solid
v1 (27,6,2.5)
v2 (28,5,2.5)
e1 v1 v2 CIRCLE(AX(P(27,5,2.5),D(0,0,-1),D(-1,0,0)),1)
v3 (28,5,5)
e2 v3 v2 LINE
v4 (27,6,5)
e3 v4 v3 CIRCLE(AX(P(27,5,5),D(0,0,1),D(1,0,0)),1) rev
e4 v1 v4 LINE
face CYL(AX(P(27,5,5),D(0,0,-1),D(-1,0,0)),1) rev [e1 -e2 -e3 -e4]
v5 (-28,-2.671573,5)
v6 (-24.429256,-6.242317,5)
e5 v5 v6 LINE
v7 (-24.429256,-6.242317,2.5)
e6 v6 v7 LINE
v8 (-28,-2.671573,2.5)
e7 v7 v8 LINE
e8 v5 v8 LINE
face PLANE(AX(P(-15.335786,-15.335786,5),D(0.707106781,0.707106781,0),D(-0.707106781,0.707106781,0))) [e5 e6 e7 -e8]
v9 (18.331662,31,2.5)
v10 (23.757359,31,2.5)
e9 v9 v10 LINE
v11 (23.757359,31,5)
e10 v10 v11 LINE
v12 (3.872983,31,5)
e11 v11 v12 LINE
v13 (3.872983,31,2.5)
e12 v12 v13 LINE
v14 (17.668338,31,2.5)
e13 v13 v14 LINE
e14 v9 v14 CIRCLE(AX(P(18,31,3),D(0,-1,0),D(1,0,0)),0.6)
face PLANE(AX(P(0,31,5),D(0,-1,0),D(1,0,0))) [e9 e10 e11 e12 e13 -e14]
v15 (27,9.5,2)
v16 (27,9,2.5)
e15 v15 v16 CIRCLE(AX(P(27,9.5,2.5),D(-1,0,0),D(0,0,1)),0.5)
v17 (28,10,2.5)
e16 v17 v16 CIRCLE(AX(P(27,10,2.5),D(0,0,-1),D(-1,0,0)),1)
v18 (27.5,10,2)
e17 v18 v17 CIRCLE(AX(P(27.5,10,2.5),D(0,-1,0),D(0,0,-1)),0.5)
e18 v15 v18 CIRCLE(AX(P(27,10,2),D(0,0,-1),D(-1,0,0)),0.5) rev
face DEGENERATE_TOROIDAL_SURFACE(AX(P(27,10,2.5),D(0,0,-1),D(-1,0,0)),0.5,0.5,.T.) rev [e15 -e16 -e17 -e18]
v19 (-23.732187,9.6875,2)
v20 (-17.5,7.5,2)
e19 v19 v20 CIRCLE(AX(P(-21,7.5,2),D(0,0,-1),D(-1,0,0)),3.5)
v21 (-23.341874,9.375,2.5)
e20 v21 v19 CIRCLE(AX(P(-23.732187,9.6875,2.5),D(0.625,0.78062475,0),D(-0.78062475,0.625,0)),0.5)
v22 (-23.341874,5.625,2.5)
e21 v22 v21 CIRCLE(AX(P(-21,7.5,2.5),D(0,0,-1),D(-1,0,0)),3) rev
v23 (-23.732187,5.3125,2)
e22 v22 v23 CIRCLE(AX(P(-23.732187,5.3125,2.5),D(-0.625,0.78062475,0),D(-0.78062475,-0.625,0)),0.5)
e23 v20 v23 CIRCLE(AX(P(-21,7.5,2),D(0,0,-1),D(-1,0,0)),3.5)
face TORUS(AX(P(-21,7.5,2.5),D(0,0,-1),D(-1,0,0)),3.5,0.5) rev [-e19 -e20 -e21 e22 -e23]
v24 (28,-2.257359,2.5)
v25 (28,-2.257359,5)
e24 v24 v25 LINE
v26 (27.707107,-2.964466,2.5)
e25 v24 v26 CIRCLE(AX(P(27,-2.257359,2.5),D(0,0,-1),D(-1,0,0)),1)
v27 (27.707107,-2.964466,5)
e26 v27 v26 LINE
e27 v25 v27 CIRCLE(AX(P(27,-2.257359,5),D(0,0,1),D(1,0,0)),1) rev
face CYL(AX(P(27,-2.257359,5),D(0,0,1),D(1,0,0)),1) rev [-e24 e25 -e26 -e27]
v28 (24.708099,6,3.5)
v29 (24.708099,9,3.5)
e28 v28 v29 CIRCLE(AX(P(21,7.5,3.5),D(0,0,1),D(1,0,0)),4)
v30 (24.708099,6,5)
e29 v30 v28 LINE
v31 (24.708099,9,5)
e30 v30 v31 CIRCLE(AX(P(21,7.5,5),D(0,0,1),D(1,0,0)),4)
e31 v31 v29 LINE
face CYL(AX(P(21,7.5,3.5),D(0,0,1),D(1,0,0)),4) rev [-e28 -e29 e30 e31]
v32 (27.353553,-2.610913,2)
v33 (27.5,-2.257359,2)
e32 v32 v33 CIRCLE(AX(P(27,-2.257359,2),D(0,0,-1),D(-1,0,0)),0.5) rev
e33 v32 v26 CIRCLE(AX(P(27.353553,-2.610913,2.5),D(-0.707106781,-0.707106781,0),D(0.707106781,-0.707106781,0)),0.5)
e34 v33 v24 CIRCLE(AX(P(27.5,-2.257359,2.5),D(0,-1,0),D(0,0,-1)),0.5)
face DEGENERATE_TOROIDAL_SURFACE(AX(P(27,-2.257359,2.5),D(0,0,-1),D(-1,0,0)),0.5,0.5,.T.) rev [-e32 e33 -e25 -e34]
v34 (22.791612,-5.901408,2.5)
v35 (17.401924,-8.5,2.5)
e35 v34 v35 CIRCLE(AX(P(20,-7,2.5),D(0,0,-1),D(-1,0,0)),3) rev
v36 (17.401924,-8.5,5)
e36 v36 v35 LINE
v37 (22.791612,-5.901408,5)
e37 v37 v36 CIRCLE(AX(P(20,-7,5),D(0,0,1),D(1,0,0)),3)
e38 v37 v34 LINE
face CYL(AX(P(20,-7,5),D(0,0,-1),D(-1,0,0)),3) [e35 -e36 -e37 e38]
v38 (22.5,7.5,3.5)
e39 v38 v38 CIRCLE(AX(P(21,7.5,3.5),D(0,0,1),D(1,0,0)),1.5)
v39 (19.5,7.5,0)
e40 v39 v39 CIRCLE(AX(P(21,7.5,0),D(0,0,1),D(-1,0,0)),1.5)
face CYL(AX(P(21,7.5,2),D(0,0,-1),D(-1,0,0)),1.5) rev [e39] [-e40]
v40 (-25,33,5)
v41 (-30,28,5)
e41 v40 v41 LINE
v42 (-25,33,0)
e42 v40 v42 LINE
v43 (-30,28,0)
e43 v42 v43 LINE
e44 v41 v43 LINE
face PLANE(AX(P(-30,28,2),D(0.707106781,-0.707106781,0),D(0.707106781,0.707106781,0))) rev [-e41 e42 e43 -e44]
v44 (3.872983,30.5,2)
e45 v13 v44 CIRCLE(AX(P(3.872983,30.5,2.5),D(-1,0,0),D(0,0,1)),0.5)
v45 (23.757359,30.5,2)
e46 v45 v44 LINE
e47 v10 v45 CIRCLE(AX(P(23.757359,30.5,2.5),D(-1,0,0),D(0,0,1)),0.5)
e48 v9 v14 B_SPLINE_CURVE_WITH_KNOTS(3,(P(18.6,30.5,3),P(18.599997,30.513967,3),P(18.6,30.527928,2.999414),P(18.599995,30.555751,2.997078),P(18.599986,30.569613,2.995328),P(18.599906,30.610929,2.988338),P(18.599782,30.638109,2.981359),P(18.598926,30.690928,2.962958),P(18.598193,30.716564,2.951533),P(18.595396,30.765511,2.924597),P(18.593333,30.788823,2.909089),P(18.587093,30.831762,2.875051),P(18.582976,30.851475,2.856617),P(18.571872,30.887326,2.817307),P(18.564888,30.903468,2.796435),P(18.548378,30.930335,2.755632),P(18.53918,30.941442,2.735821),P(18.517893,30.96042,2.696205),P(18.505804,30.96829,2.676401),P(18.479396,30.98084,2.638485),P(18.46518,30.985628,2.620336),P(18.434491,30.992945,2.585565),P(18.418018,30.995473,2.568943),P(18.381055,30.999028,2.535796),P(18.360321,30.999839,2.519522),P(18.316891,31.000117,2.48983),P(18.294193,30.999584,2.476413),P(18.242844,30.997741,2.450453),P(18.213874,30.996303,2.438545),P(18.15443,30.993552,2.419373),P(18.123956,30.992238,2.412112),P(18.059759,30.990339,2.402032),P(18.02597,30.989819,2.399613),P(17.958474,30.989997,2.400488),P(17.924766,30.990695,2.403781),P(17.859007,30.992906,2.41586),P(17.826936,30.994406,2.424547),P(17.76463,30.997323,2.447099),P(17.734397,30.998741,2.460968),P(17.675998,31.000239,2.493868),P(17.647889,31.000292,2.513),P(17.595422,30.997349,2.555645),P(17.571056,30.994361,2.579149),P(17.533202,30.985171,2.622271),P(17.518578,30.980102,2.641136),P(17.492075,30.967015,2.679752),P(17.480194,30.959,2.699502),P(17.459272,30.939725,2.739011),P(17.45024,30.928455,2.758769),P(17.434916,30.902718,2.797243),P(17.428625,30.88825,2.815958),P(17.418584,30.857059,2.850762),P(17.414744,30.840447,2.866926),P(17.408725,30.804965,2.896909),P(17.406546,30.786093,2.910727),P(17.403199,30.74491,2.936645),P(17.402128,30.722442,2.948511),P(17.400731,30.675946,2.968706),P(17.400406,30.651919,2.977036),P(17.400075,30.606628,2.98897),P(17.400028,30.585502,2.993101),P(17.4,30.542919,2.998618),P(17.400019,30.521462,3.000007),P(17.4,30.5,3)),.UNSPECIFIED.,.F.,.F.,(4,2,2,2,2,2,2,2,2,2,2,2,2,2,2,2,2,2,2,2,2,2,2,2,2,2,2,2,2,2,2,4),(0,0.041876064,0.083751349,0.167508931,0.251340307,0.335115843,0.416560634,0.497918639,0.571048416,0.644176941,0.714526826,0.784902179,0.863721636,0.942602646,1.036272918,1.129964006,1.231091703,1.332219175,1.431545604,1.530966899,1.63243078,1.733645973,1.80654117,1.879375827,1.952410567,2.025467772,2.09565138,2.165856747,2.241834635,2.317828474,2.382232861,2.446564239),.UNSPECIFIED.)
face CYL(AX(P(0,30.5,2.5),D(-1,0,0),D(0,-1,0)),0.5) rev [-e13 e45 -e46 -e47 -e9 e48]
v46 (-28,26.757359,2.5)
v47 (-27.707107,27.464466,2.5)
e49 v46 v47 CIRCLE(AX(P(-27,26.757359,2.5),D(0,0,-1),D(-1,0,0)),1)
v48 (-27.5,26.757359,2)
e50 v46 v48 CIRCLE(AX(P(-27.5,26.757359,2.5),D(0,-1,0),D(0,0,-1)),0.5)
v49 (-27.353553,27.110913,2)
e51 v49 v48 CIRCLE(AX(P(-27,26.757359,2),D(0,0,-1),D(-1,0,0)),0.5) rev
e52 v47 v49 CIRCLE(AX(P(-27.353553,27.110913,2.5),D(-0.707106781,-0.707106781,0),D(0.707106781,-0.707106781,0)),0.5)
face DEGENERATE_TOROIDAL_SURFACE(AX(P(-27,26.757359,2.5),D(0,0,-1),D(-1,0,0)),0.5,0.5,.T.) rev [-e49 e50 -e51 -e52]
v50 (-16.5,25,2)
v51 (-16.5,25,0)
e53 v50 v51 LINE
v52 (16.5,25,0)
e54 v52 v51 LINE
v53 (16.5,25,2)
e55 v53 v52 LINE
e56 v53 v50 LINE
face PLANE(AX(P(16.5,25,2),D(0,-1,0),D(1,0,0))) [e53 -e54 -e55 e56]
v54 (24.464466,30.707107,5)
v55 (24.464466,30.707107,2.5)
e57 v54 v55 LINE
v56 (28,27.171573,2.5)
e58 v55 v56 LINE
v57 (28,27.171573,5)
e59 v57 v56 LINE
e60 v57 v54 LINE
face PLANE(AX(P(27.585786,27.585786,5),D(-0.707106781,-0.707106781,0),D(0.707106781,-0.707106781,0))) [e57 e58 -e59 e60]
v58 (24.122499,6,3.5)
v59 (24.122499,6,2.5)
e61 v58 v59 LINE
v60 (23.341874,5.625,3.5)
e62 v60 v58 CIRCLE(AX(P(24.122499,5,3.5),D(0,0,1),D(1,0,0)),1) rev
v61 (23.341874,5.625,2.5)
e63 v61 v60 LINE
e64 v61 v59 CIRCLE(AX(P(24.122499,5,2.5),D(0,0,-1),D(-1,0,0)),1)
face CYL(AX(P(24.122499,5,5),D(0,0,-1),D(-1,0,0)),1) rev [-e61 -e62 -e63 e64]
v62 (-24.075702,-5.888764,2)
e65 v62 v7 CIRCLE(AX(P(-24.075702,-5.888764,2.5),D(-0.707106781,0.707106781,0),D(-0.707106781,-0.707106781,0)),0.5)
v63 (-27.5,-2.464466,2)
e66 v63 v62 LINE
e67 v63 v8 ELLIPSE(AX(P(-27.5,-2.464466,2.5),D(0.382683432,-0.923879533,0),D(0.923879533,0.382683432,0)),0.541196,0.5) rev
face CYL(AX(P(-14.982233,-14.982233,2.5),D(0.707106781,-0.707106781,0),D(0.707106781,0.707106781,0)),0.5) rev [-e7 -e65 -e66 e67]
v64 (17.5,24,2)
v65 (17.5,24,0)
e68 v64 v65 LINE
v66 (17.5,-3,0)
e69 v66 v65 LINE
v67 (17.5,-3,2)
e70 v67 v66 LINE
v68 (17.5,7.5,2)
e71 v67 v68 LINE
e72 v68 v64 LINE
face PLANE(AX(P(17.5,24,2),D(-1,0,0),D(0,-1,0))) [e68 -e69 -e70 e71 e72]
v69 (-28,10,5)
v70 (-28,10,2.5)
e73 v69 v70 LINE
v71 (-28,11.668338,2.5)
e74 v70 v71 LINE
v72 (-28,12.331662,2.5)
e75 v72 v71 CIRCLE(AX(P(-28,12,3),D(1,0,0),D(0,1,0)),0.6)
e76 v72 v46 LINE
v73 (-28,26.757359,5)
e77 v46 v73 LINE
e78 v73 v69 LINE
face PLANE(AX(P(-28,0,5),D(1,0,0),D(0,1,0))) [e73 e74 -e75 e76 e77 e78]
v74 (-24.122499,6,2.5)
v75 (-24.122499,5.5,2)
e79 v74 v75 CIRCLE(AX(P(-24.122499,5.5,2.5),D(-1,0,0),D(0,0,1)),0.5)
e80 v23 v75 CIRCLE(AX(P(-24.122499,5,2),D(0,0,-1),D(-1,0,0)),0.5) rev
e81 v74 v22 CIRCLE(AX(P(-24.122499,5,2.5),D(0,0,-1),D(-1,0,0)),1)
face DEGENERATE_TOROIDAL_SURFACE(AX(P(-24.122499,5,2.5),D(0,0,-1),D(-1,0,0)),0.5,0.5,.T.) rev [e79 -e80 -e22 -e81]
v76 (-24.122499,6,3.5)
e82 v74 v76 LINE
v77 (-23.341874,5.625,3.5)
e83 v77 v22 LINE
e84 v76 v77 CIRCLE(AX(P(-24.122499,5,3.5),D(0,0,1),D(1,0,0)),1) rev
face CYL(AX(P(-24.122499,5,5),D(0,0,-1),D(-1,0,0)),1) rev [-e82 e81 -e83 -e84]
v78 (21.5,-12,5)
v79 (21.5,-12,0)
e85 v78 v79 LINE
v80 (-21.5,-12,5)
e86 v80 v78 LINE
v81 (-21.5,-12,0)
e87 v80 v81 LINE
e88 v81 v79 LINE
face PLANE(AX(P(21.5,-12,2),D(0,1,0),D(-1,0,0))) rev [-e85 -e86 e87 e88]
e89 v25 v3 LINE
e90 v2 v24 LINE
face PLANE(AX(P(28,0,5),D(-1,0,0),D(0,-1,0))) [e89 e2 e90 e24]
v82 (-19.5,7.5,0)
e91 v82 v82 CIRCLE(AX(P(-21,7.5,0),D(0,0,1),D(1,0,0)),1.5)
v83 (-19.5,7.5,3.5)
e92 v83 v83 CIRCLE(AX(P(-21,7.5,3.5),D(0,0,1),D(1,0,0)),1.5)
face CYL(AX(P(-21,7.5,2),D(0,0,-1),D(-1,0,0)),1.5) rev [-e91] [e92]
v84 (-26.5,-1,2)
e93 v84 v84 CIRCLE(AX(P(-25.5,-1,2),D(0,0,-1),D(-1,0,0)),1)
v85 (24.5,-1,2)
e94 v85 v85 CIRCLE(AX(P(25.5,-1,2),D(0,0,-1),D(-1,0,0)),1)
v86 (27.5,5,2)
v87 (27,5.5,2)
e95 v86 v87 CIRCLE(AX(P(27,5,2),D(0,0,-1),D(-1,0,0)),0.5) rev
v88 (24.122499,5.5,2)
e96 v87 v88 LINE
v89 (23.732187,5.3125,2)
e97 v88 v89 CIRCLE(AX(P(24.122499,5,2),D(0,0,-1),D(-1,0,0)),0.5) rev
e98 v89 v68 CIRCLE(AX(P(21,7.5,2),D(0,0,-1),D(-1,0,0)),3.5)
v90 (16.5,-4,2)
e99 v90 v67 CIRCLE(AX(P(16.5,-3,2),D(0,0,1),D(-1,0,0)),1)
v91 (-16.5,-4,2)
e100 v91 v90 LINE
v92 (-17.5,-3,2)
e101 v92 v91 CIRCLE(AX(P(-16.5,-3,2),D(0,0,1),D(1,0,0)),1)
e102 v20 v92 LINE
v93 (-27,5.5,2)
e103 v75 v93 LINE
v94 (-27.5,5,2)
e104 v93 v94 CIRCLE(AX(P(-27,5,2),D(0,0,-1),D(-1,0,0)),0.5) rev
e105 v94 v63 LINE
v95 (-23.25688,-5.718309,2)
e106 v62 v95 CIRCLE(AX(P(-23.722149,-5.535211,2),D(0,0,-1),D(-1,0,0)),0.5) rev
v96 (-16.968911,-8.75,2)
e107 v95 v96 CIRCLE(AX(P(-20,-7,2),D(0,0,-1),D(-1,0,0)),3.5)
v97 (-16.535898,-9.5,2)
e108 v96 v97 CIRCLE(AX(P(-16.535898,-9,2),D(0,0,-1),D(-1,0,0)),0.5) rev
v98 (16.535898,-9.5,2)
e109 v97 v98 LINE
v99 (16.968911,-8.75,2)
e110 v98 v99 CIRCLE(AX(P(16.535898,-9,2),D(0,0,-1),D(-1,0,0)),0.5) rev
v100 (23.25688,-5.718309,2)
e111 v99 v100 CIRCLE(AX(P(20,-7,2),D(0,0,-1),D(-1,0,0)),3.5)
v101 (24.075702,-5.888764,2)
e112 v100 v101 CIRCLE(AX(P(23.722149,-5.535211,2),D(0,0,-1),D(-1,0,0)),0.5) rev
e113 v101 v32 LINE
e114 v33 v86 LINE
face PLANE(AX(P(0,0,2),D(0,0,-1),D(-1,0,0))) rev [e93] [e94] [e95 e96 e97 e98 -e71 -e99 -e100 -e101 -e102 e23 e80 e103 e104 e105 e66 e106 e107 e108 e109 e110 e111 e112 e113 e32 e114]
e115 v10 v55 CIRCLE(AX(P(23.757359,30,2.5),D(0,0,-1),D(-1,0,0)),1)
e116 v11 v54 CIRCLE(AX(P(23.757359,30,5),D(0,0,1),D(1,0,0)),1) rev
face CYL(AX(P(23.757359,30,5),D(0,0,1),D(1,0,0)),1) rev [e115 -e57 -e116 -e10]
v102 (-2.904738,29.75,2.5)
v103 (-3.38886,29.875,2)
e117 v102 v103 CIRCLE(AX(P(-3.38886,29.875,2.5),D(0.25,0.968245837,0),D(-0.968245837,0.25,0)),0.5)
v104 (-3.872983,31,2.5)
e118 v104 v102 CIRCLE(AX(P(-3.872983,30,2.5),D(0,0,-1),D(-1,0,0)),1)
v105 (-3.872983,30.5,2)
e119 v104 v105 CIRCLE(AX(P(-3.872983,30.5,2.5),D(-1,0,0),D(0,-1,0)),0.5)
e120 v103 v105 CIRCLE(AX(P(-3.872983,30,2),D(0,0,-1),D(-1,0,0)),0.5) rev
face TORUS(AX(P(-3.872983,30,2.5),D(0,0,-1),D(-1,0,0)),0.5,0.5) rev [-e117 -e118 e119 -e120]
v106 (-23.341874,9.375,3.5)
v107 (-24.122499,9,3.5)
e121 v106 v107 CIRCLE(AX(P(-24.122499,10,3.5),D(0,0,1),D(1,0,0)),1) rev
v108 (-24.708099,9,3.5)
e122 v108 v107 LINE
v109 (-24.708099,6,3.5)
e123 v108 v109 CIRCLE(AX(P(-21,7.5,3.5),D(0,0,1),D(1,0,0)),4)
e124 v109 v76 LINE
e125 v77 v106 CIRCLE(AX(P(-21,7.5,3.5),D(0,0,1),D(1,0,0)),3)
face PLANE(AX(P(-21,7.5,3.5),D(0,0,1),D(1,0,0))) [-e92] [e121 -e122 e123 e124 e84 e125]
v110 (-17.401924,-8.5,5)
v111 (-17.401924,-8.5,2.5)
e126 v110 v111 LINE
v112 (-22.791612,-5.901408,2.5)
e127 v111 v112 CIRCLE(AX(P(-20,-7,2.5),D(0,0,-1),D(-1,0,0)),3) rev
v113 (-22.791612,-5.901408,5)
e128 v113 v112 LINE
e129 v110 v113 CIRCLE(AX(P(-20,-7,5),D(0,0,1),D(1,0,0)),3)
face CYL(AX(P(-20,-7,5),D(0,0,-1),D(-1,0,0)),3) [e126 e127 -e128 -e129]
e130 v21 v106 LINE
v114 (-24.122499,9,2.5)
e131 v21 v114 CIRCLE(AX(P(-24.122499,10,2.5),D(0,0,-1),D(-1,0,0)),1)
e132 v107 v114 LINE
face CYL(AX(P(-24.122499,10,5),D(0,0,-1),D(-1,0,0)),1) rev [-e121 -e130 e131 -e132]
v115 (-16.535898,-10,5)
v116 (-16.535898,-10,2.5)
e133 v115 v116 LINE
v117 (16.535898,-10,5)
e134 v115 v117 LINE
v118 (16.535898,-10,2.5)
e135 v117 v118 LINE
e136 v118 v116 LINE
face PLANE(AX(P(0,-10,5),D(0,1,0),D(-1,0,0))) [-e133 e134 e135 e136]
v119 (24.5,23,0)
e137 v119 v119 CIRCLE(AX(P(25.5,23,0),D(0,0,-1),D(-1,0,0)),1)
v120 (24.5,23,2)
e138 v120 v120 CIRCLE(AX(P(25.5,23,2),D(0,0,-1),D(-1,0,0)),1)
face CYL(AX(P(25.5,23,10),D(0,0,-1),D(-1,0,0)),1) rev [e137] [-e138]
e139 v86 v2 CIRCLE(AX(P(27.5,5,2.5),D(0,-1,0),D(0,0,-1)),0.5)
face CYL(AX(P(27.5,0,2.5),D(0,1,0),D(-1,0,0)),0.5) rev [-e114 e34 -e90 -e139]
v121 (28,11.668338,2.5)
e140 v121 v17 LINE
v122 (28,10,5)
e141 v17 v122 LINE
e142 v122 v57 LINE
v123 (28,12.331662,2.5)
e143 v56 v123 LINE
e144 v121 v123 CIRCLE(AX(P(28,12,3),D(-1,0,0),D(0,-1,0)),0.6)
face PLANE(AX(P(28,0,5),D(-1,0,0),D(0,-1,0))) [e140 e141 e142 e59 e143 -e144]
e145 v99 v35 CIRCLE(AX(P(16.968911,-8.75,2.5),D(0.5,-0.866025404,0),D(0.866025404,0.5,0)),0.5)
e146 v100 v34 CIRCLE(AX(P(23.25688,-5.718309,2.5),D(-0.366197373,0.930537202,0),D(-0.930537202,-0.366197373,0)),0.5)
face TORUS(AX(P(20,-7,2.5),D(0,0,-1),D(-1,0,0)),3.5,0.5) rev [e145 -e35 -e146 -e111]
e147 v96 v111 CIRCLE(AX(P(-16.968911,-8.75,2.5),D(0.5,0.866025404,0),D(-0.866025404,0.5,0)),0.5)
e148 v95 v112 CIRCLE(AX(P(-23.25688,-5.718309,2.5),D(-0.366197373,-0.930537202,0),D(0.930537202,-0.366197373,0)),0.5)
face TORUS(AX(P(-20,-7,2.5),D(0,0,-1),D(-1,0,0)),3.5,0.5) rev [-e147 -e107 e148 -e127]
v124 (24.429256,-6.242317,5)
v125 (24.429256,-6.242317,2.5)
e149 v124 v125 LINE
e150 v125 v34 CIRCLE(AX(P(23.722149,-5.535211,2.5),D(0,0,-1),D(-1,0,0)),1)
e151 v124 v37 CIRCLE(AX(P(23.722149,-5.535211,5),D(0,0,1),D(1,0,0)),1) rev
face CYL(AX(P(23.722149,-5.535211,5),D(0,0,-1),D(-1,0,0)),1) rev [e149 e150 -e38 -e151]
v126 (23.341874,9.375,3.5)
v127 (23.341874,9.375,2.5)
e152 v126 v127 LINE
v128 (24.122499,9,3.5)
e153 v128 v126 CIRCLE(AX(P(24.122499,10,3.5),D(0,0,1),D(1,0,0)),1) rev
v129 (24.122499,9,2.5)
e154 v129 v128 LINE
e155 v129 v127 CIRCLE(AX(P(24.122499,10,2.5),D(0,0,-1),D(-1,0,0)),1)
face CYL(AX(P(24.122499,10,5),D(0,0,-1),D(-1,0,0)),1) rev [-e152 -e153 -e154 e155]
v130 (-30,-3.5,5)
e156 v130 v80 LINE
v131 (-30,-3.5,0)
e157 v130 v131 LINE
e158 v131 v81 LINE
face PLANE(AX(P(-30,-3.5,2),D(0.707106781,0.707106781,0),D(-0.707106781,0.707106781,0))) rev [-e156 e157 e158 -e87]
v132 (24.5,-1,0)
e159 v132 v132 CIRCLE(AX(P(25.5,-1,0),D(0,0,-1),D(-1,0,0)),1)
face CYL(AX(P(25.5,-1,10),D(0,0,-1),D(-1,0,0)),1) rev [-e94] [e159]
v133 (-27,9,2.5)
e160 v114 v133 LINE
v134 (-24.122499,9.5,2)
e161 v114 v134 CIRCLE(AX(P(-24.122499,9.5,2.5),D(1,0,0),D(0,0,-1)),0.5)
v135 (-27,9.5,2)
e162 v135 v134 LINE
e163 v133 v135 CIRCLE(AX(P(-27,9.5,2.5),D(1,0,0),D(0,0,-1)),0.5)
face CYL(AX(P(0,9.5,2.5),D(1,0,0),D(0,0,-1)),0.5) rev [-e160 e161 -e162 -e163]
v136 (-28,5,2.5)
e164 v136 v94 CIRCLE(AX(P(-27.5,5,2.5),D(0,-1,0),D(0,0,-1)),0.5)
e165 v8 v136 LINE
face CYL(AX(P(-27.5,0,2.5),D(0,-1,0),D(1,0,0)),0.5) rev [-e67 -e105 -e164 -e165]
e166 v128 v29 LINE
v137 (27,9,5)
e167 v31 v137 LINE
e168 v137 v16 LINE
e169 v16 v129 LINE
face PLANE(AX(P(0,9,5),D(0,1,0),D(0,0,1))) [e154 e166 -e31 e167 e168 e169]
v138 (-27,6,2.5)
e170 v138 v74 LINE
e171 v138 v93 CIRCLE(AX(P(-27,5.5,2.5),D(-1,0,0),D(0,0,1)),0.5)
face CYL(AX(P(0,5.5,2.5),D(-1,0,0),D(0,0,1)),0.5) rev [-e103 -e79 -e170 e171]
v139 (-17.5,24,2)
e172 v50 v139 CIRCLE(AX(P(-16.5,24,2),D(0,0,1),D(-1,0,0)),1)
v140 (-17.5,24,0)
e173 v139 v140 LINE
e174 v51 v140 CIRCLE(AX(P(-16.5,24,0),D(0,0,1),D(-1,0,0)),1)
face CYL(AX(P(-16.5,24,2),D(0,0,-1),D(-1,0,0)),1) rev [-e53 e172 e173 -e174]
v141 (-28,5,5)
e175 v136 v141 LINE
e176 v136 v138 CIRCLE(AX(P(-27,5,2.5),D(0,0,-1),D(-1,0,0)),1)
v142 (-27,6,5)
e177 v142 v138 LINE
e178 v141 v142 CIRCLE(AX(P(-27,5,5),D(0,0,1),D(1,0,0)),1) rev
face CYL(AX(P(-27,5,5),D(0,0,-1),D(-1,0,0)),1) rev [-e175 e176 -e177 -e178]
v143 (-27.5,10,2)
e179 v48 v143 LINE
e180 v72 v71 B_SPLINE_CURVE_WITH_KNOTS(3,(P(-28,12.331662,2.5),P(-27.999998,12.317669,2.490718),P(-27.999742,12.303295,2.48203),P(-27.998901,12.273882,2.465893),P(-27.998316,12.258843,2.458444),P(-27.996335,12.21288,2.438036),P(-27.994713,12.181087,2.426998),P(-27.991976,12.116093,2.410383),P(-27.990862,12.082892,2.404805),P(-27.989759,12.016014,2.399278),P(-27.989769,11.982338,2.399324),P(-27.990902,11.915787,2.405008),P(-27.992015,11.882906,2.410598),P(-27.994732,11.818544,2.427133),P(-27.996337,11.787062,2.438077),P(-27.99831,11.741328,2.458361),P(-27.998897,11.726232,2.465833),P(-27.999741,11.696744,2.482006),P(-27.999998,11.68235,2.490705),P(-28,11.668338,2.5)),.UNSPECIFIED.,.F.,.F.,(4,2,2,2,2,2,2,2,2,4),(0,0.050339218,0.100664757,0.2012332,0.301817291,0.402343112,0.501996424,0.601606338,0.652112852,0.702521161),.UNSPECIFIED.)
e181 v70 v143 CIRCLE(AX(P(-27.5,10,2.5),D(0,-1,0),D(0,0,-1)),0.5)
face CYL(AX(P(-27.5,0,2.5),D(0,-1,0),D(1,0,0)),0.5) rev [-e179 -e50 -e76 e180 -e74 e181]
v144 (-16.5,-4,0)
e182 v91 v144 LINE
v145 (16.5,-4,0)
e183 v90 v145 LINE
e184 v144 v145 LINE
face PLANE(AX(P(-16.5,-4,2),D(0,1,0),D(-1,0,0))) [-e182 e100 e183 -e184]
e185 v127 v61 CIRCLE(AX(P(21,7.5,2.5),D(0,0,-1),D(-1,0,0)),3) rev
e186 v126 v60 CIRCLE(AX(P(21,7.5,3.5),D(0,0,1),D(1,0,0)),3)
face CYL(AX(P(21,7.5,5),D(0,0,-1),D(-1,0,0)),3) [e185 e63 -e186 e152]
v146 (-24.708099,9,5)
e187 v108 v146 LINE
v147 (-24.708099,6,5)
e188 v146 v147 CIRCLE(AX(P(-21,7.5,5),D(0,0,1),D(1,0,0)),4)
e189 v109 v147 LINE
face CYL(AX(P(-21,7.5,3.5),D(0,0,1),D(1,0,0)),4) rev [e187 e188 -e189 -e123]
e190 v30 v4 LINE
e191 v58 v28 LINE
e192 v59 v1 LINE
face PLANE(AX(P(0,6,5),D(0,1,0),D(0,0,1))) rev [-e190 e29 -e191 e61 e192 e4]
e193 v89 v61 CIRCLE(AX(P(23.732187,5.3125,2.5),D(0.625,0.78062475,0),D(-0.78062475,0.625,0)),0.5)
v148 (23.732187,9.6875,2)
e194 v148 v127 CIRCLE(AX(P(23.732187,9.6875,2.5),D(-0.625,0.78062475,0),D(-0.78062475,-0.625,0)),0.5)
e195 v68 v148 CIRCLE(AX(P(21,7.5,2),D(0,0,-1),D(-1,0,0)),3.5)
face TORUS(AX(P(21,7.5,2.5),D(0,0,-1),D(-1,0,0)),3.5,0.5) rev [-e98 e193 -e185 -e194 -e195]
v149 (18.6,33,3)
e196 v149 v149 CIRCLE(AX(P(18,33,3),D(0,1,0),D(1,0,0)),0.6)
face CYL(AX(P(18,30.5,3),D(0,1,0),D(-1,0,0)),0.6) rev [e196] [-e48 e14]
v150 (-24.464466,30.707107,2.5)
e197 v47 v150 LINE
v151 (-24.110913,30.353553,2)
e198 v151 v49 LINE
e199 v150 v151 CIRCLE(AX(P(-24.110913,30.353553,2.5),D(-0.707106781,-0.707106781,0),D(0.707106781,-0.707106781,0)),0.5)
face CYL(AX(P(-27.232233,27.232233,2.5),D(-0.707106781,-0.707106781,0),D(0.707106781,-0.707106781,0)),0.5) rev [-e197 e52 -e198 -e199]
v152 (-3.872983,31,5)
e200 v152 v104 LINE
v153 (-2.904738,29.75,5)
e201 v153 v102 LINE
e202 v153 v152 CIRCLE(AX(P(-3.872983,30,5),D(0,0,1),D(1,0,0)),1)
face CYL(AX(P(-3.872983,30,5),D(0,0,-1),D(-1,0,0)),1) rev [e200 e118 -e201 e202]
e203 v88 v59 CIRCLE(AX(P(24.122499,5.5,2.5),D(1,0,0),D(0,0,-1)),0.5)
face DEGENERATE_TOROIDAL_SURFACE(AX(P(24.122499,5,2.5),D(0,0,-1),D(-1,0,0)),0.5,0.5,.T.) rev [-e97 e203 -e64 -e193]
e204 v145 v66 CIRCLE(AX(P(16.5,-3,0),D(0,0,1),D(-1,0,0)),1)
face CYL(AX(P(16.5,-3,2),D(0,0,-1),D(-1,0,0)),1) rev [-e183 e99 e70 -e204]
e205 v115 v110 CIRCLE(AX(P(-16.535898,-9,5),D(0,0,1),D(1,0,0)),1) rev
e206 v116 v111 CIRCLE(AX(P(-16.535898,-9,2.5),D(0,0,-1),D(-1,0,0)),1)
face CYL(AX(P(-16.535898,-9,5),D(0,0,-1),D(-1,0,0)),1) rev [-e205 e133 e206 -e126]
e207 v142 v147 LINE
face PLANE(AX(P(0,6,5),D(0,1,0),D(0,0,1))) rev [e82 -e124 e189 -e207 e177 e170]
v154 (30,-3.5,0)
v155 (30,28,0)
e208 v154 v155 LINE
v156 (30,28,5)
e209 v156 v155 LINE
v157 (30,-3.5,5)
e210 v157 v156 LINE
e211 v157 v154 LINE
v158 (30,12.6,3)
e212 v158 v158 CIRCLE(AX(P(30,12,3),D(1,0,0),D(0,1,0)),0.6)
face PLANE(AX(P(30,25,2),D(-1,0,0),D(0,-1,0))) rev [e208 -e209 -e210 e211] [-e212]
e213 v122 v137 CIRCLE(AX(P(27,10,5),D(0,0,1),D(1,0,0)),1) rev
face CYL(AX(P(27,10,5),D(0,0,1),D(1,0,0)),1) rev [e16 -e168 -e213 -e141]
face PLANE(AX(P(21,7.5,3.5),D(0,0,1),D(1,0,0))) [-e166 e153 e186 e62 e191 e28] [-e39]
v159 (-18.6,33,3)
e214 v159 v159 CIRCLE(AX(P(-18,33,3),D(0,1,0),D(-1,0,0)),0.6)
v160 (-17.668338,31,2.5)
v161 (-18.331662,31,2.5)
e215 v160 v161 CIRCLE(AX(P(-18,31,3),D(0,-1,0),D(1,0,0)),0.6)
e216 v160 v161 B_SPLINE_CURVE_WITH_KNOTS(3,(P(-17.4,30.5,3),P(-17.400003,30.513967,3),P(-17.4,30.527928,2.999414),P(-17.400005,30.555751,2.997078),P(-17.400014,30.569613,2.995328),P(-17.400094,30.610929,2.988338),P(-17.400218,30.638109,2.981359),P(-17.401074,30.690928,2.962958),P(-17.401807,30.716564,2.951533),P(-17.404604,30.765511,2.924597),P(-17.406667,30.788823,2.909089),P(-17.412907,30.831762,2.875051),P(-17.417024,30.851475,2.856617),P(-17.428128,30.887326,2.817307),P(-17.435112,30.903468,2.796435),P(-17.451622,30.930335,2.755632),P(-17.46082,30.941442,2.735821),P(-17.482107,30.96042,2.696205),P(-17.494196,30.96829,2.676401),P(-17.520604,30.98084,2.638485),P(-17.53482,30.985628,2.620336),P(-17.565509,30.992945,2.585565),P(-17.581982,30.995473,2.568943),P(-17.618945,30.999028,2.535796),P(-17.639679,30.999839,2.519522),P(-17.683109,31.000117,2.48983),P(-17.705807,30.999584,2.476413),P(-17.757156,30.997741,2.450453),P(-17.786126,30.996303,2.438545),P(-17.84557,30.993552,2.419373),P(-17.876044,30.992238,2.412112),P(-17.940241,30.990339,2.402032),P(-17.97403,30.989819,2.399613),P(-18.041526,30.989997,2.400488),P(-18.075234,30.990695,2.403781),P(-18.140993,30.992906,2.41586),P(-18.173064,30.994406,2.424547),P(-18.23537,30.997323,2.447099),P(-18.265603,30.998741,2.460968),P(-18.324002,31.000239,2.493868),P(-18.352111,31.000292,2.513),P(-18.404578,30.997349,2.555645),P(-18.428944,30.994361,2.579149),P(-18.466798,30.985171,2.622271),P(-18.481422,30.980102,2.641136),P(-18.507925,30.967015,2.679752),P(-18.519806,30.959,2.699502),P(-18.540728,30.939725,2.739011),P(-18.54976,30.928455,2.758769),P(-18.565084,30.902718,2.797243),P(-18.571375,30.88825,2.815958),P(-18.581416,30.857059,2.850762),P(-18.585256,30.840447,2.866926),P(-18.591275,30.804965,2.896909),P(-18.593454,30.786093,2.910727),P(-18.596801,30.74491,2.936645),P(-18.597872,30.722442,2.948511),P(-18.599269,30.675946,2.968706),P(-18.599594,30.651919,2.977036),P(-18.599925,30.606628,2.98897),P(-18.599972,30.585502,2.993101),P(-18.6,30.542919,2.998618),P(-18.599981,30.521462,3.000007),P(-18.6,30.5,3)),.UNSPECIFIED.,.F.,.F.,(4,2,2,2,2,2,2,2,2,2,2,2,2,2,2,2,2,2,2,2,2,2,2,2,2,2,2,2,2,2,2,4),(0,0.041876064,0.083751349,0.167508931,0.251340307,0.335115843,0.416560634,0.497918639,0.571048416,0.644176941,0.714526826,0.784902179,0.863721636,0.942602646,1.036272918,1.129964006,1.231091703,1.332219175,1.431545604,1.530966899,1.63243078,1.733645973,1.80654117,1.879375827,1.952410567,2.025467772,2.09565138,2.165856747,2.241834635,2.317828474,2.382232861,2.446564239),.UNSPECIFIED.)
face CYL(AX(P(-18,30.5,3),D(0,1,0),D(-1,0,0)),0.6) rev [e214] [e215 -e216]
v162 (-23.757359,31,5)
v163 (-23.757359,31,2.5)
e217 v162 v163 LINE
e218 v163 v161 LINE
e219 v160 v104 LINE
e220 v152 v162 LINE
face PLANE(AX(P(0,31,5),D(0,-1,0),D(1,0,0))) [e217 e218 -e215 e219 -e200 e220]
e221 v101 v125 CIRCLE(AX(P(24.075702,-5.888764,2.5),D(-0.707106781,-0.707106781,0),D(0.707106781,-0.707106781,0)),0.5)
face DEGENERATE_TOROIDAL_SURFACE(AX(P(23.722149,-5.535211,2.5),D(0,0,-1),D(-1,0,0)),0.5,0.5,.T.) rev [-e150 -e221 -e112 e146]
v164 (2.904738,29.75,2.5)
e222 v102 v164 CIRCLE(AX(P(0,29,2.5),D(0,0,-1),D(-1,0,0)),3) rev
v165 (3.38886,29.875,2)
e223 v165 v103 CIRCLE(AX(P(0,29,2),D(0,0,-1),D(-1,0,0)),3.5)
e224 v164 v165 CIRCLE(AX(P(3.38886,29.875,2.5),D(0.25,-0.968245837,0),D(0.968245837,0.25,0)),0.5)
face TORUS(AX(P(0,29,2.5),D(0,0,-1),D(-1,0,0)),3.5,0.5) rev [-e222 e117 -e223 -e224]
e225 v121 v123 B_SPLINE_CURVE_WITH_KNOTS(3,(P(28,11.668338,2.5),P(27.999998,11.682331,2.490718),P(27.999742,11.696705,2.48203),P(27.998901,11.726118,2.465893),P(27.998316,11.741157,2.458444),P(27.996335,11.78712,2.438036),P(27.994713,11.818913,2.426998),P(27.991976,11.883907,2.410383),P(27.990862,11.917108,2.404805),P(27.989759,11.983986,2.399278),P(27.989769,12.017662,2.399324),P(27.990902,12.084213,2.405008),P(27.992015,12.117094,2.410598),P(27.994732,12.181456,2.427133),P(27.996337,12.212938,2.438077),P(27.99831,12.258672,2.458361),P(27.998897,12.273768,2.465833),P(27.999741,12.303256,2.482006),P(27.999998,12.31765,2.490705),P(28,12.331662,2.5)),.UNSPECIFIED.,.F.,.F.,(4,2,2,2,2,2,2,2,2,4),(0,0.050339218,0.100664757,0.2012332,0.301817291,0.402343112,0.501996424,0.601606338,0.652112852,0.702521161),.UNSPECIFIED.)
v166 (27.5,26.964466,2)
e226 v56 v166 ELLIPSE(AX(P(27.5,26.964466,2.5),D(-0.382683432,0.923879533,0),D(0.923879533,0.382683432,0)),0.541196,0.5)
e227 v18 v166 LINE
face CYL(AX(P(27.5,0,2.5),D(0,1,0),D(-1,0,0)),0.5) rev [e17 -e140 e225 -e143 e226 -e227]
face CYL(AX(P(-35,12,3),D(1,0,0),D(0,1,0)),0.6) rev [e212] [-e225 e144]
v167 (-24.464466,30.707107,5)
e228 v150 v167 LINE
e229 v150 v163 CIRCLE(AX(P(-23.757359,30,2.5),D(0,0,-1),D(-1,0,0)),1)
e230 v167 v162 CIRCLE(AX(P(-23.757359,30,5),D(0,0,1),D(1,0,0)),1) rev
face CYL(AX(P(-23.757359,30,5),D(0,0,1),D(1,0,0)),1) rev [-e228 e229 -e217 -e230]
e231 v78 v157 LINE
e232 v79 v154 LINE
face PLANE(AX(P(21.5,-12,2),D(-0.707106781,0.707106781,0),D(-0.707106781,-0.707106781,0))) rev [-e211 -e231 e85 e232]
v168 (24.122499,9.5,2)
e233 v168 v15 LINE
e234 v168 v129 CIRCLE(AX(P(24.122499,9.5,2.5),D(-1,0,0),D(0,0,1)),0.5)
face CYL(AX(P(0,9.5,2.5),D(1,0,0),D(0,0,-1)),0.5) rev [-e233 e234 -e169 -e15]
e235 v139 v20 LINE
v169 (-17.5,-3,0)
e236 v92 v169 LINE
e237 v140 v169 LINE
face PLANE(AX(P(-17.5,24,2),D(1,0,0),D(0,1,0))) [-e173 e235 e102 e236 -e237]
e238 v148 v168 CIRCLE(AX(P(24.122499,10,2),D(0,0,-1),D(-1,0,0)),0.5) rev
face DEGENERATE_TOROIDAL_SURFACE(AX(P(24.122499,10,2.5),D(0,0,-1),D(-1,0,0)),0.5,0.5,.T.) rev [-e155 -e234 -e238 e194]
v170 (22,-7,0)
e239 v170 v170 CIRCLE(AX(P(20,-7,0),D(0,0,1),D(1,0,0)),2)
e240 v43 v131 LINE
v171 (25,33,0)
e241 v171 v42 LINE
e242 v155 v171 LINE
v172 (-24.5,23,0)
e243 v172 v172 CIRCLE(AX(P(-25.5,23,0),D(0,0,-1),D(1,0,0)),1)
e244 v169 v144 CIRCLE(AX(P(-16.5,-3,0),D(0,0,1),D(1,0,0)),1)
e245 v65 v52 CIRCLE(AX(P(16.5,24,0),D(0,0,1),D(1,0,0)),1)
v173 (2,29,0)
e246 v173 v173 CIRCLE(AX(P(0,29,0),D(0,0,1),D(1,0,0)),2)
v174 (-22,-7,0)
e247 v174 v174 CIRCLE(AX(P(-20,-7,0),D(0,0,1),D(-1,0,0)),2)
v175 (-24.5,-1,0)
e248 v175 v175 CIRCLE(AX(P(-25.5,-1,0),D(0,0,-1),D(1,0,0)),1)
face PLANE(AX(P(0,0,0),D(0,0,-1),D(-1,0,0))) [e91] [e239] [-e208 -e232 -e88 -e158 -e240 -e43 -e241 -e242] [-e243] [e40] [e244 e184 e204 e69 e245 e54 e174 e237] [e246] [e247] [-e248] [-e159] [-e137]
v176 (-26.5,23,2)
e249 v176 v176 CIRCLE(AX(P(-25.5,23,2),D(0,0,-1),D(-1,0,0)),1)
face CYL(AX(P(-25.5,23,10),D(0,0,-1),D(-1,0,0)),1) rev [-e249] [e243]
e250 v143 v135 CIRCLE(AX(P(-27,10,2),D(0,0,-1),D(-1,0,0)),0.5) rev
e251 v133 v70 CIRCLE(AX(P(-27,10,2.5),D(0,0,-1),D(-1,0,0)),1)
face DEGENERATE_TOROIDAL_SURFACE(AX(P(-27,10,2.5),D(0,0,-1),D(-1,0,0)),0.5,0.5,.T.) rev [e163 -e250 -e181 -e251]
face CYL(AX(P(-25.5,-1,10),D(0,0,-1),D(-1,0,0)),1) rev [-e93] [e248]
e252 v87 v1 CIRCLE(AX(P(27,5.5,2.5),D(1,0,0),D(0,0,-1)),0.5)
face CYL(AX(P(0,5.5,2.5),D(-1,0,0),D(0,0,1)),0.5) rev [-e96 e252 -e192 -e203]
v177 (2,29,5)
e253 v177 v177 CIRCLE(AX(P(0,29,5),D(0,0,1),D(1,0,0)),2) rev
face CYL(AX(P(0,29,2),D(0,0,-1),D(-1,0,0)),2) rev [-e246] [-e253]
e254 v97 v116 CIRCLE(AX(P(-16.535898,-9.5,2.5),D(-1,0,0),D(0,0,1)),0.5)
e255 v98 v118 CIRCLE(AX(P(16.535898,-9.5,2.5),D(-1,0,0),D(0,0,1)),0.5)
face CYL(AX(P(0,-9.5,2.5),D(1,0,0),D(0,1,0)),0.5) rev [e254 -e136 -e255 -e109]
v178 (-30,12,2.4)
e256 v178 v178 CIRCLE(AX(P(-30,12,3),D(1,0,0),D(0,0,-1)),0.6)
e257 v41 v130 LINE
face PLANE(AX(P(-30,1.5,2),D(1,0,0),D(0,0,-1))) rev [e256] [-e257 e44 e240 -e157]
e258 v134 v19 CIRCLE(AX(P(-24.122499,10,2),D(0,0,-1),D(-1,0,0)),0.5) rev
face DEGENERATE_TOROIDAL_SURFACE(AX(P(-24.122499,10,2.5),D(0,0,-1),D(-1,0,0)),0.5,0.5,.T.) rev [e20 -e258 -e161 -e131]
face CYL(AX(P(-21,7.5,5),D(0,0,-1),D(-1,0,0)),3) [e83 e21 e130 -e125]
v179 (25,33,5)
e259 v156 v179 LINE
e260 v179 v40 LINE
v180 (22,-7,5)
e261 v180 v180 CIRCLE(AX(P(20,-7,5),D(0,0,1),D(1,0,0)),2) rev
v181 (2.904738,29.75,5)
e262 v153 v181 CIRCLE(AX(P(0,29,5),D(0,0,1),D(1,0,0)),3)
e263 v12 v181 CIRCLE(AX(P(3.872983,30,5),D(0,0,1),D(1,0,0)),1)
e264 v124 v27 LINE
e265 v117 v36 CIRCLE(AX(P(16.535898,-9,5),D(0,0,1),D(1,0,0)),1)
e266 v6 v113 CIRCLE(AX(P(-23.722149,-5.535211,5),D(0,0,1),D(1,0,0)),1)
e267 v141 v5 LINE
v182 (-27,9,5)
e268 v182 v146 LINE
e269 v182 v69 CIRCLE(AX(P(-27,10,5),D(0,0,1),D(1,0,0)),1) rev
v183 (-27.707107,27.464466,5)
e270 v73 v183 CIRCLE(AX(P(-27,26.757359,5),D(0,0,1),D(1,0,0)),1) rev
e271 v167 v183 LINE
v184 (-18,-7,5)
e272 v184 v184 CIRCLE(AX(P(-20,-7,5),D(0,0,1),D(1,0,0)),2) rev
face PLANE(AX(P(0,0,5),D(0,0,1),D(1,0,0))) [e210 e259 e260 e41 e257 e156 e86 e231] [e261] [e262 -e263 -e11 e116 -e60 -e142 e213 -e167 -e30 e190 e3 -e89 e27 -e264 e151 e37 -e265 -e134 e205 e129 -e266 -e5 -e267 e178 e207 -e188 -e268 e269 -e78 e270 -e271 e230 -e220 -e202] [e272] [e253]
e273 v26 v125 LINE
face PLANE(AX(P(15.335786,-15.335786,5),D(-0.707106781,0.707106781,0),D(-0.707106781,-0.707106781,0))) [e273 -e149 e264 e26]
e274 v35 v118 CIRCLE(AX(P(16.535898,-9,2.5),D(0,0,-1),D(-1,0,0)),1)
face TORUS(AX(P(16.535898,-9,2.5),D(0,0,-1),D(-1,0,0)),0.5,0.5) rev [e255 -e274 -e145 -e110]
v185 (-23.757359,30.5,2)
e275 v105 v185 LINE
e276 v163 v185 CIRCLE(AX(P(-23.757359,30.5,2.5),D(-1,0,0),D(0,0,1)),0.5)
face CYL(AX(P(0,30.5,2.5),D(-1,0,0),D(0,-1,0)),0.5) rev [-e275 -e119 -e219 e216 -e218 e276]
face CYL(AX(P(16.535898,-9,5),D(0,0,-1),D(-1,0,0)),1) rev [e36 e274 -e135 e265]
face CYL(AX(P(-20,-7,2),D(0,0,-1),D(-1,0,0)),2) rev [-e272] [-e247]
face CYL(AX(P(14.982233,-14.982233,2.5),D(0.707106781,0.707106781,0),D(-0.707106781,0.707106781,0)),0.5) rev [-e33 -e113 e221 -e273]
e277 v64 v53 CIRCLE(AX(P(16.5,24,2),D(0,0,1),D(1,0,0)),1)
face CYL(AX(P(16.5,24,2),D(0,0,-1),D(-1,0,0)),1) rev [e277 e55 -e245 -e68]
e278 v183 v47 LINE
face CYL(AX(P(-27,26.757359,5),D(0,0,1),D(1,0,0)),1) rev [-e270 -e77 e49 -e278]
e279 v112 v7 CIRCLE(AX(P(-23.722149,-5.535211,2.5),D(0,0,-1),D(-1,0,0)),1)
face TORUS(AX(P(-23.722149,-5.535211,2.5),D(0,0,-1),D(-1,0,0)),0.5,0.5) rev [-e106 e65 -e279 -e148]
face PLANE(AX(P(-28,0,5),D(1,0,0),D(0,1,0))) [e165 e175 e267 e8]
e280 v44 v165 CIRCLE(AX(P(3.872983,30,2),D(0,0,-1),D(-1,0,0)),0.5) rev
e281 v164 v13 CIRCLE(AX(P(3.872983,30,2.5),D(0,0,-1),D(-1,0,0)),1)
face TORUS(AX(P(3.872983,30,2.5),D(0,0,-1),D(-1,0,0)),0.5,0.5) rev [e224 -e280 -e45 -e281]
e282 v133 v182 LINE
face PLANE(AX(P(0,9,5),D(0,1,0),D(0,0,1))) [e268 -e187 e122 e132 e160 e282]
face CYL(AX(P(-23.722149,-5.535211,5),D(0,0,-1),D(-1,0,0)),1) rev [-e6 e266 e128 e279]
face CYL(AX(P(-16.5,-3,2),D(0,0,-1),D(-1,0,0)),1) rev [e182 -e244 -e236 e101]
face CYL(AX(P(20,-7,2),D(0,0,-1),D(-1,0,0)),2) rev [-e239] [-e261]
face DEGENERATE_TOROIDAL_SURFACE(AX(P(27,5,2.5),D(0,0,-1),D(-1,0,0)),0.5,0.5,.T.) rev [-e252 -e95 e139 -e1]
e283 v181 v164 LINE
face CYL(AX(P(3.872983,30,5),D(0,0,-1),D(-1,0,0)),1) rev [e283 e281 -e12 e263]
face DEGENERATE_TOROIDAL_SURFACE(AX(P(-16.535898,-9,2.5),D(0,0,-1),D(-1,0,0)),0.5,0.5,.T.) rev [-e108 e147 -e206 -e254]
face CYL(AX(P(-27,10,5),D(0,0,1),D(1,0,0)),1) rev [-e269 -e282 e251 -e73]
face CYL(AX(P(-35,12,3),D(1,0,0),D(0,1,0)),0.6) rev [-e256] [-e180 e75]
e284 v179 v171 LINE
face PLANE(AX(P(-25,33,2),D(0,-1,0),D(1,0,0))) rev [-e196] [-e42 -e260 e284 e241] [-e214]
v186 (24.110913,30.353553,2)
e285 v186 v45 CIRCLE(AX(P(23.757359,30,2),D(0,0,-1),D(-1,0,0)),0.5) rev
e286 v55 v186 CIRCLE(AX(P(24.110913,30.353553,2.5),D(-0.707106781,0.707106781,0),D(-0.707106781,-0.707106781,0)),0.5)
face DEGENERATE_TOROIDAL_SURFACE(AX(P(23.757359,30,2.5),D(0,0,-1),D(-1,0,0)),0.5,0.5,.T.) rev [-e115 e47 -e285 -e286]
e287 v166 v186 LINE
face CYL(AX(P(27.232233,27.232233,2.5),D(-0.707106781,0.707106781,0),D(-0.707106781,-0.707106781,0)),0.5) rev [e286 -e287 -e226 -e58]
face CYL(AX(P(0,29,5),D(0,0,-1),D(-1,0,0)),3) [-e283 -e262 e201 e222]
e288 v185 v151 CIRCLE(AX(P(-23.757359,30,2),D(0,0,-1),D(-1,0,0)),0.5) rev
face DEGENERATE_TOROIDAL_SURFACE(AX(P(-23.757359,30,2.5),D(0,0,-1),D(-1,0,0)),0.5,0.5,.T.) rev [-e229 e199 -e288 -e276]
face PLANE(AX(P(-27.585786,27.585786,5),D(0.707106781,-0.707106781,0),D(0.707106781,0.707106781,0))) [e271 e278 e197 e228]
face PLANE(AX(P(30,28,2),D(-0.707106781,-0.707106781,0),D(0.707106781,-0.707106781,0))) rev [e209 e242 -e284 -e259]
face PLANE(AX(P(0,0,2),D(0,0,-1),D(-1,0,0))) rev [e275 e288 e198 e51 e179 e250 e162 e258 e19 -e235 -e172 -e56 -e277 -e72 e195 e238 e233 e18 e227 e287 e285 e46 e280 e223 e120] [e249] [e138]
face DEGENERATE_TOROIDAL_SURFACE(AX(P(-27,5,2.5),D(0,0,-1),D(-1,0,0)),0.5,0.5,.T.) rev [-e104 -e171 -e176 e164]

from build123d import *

# Parameters (mm, degrees)
SKETCH_1_R                = 2
SKETCH_1_R_2              = 1.5
EXTRUDE_1_DEPTH           = 2
BOSS_EXTRUDE1_OUTLINE_R   = 2
BOSS_EXTRUDE1_OUTLINE_R_2 = 1.5
BOSS_EXTRUDE1_DEPTH       = 3
FILLET2_R                 = 1
FILLET3_R                 = 0.5
SKETCH4_R                 = 4
CUT_EXTRUDE3_DEPTH        = 1.5
SKETCH5_R                 = 0.6
CUT_EXTRUDE4_DEPTH        = 2.5
SKETCH3_R                 = 1
CUT_EXTRUDE5_DEPTH        = 10
SKETCH6_R                 = 0.6
CUT_EXTRUDE6_DEPTH        = 65


# Read off the part's stored shape, not the designer's step: Boss-Extrude1
with BuildPart() as part:
    # 草图1 → 凸台-拉伸1 (new body)
    with BuildSketch(Plane.XY):
        Polygon((-30, 1.5), (-30, -3.5), (-21.5, -12), (-15.5, -12), (15.5, -12), (21.5, -12), (30, -3.5), (30, 1.5), (30, 25), (30, 28), (25, 33), (-25, 33), (-30, 28), (-30, 25), align=None)
        with Locations((20, -7)):
            Circle(SKETCH_1_R, mode=Mode.SUBTRACT)
        with Locations((0, 29)):
            Circle(SKETCH_1_R, mode=Mode.SUBTRACT)
        with Locations(Location((-20, -7, 0), (0, 0, 180))):
            Circle(SKETCH_1_R, mode=Mode.SUBTRACT)
        with Locations((-21, 7.5)):
            Circle(SKETCH_1_R_2, mode=Mode.SUBTRACT)
        with Locations(Location((21, 7.5, 0), (0, 0, 180))):
            Circle(SKETCH_1_R_2, mode=Mode.SUBTRACT)
        with BuildLine():
            Line((-17.5, 24), (-17.5, -3))
            ThreePointArc((-17.5, -3), (-17.207106781, -3.707106781), (-16.5, -4))
            Line((-16.5, -4), (16.5, -4))
            ThreePointArc((16.5, -4), (17.207106781, -3.707106781), (17.5, -3))
            Line((17.5, -3), (17.5, 24))
            ThreePointArc((17.5, 24), (17.207106781, 24.707106781), (16.5, 25))
            Line((16.5, 25), (-16.5, 25))
            ThreePointArc((-16.5, 25), (-17.207106781, 24.707106781), (-17.5, 24))
        make_face(mode=Mode.SUBTRACT)
    extrude(amount=EXTRUDE_1_DEPTH)

    # Boss-Extrude1 outline → Boss-Extrude1 (add)
    with BuildSketch(Plane.XY.offset(2)):
        Polygon((-21.5, -12), (21.5, -12), (30, -3.5), (30, 28), (25, 33), (-25, 33), (-30, 28), (-30, -3.5), align=None)
        with Locations((-20, -7)):
            Circle(BOSS_EXTRUDE1_OUTLINE_R, mode=Mode.SUBTRACT)
        with Locations((-21, 7.5)):
            Circle(BOSS_EXTRUDE1_OUTLINE_R_2, mode=Mode.SUBTRACT)
        with Locations((20, -7)):
            Circle(BOSS_EXTRUDE1_OUTLINE_R, mode=Mode.SUBTRACT)
        with Locations((21, 7.5)):
            Circle(BOSS_EXTRUDE1_OUTLINE_R_2, mode=Mode.SUBTRACT)
        with BuildLine():
            Line((28, 6), (28, -2.671572875))
            Line((28, -2.671572875), (24.429255588, -6.242317287))
            ThreePointArc((24.429255588, -6.242317287), (23.518347202, -6.514222715), (22.791611605, -5.90140788))
            ThreePointArc((22.791611605, -5.90140788), (18.697105438, -4.297692512), (17.401923789, -8.5))
            ThreePointArc((17.401923789, -8.5), (17.401923789, -9.5), (16.535898385, -10))
            Line((16.535898385, -10), (-16.535898385, -10))
            ThreePointArc((-16.535898385, -10), (-17.401923789, -9.5), (-17.401923789, -8.5))
            ThreePointArc((-17.401923789, -8.5), (-18.697105438, -4.297692512), (-22.791611605, -5.90140788))
            ThreePointArc((-22.791611605, -5.90140788), (-23.518347202, -6.514222715), (-24.429255588, -6.242317287))
            Line((-24.429255588, -6.242317287), (-28, -2.671572875))
            Line((-28, -2.671572875), (-28, 6))
            Line((-28, 6), (-23.598076211, 6))
            ThreePointArc((-23.598076211, 6), (-18, 7.5), (-23.598076211, 9))
            Line((-23.598076211, 9), (-28, 9))
            Line((-28, 9), (-28, 27.171572875))
            Line((-28, 27.171572875), (-24.171572875, 31))
            Line((-24.171572875, 31), (-3.872983346, 31))
            ThreePointArc((-3.872983346, 31), (-3.082413931, 30.612372436), (-2.90473751, 29.75))
            ThreePointArc((-2.90473751, 29.75), (0, 26), (2.90473751, 29.75))
            ThreePointArc((2.90473751, 29.75), (3.082413931, 30.612372436), (3.872983346, 31))
            Line((3.872983346, 31), (24.171572875, 31))
            Line((24.171572875, 31), (28, 27.171572875))
            Line((28, 27.171572875), (28, 9))
            Line((28, 9), (23.598076211, 9))
            ThreePointArc((23.598076211, 9), (18, 7.5), (23.598076211, 6))
            Line((23.598076211, 6), (28, 6))
        make_face(mode=Mode.SUBTRACT)
        with Locations((0, 29)):
            Circle(BOSS_EXTRUDE1_OUTLINE_R, mode=Mode.SUBTRACT)
    extrude(amount=BOSS_EXTRUDE1_DEPTH)

    # Fillet2
    fillet2_edges = [part.edges().sort_by_distance(p)[0] for p in [
        (28, -2.671572875, 3.5),
        (-28, 6, 3.5),
        (-23.598076211, 6, 3.5),
        (-23.598076211, 9, 3.5),
        (-28, 9, 3.5),
        (-28, 27.171572875, 3.5),
        (-24.171572875, 31, 3.5),
        (24.171572875, 31, 3.5),
        (28, 9, 3.5),
        (23.598076211, 9, 3.5),
        (23.598076211, 6, 3.5),
        (28, 6, 3.5),
    ]]
    fillet(fillet2_edges, radius=FILLET2_R)

    # Fillet3
    fillet3_edges = [part.edges().sort_by_distance(p)[0] for p in [
        (23.518347202, -6.514222715, 2),
        (18.697105438, -4.297692512, 2),
        (-17.401923789, -9.5, 2),
        (-18.697105438, -4.297692512, 2),
        (0, 26, 2),
        (26.068181185, -4.60339169, 2),
        (26.232233047, 28.939339828, 2),
        (3.082413931, 30.612372436, 2),
        (-3.082413931, 30.612372436, 2),
        (-13.815171329, 31, 2),
        (-26.214627794, -4.456945081, 2),
        (-23.518347202, -6.514222715, 2),
        (0, -10, 2),
        (17.401923789, -9.5, 2),
        (18, 7.5, 2),
        (28, 1.371320344, 2),
        (25.561249499, 6, 2),
        (25.561249499, 9, 2),
        (28, 18.585786437, 2),
        (13.815171329, 31, 2),
        (-26.085786437, 29.085786438, 2),
        (-28, 18.378679656, 2),
        (-25.561249499, 9, 2),
        (-18, 7.5, 2),
        (-25.561249499, 6, 2),
        (-28, 1.164213562, 2),
        (-24.140042745, 30.923879533, 2),
        (-27.923879533, 27.140042745, 2),
        (24.140042745, 30.923879533, 2),
        (27.923879533, -2.640042745, 2),
        (-27.707106781, 9.292893219, 2),
        (-23.689486297, 9.098612181, 2),
        (-23.689486297, 5.901387819, 2),
        (-27.707106781, 5.707106781, 2),
        (23.689486297, 5.901387819, 2),
        (27.707106781, 5.707106781, 2),
        (27.707106781, 9.292893219, 2),
        (23.689486297, 9.098612181, 2),
    ]]
    fillet(fillet3_edges, radius=FILLET3_R - 0.0001)  # a hair under: the kernel refuses the full size

    # Sketch4 → Cut-Extrude3 (cut)
    with BuildSketch(Plane.XY.offset(5)):
        with Locations((-21, 7.5)):
            Circle(SKETCH4_R)
        with Locations((21, 7.5)):
            Circle(SKETCH4_R)
    extrude(amount=-CUT_EXTRUDE3_DEPTH, mode=Mode.SUBTRACT)

    # Sketch5 → Cut-Extrude4 (cut)
    with BuildSketch(Plane(origin=(0, 33, 0), x_dir=(1, 0, 0), z_dir=(0, 1, 0))):
        with Locations(Location((-18, -3, 0), (0, 0, 180))):
            Circle(SKETCH5_R)
        with Locations(Location((18, -3, 0), (0, 0, 123.55730975))):
            Circle(SKETCH5_R)
    extrude(amount=-CUT_EXTRUDE4_DEPTH, mode=Mode.SUBTRACT)

    # Sketch3 → Cut-Extrude5 (cut)
    with BuildSketch(Plane(origin=(0, 0, 0), x_dir=(-1, 0, 0), z_dir=(0, 0, -1))):
        with Locations((-25.5, 23)):
            Circle(SKETCH3_R)
        with Locations((-25.5, -1)):
            Circle(SKETCH3_R)
        with Locations((25.5, -1)):
            Circle(SKETCH3_R)
        with Locations((25.5, 23)):
            Circle(SKETCH3_R)
    extrude(amount=-CUT_EXTRUDE5_DEPTH, mode=Mode.SUBTRACT)

    # Sketch6 → Cut-Extrude6 (cut)
    with BuildSketch(Plane(origin=(30, 0, 0), x_dir=(0, 0, -1), z_dir=(1, 0, 0))):
        with Locations(Location((-3, 12, 0), (0, 0, 90))):
            Circle(SKETCH6_R)
    extrude(amount=-CUT_EXTRUDE6_DEPTH, mode=Mode.SUBTRACT)


solid = part.part
